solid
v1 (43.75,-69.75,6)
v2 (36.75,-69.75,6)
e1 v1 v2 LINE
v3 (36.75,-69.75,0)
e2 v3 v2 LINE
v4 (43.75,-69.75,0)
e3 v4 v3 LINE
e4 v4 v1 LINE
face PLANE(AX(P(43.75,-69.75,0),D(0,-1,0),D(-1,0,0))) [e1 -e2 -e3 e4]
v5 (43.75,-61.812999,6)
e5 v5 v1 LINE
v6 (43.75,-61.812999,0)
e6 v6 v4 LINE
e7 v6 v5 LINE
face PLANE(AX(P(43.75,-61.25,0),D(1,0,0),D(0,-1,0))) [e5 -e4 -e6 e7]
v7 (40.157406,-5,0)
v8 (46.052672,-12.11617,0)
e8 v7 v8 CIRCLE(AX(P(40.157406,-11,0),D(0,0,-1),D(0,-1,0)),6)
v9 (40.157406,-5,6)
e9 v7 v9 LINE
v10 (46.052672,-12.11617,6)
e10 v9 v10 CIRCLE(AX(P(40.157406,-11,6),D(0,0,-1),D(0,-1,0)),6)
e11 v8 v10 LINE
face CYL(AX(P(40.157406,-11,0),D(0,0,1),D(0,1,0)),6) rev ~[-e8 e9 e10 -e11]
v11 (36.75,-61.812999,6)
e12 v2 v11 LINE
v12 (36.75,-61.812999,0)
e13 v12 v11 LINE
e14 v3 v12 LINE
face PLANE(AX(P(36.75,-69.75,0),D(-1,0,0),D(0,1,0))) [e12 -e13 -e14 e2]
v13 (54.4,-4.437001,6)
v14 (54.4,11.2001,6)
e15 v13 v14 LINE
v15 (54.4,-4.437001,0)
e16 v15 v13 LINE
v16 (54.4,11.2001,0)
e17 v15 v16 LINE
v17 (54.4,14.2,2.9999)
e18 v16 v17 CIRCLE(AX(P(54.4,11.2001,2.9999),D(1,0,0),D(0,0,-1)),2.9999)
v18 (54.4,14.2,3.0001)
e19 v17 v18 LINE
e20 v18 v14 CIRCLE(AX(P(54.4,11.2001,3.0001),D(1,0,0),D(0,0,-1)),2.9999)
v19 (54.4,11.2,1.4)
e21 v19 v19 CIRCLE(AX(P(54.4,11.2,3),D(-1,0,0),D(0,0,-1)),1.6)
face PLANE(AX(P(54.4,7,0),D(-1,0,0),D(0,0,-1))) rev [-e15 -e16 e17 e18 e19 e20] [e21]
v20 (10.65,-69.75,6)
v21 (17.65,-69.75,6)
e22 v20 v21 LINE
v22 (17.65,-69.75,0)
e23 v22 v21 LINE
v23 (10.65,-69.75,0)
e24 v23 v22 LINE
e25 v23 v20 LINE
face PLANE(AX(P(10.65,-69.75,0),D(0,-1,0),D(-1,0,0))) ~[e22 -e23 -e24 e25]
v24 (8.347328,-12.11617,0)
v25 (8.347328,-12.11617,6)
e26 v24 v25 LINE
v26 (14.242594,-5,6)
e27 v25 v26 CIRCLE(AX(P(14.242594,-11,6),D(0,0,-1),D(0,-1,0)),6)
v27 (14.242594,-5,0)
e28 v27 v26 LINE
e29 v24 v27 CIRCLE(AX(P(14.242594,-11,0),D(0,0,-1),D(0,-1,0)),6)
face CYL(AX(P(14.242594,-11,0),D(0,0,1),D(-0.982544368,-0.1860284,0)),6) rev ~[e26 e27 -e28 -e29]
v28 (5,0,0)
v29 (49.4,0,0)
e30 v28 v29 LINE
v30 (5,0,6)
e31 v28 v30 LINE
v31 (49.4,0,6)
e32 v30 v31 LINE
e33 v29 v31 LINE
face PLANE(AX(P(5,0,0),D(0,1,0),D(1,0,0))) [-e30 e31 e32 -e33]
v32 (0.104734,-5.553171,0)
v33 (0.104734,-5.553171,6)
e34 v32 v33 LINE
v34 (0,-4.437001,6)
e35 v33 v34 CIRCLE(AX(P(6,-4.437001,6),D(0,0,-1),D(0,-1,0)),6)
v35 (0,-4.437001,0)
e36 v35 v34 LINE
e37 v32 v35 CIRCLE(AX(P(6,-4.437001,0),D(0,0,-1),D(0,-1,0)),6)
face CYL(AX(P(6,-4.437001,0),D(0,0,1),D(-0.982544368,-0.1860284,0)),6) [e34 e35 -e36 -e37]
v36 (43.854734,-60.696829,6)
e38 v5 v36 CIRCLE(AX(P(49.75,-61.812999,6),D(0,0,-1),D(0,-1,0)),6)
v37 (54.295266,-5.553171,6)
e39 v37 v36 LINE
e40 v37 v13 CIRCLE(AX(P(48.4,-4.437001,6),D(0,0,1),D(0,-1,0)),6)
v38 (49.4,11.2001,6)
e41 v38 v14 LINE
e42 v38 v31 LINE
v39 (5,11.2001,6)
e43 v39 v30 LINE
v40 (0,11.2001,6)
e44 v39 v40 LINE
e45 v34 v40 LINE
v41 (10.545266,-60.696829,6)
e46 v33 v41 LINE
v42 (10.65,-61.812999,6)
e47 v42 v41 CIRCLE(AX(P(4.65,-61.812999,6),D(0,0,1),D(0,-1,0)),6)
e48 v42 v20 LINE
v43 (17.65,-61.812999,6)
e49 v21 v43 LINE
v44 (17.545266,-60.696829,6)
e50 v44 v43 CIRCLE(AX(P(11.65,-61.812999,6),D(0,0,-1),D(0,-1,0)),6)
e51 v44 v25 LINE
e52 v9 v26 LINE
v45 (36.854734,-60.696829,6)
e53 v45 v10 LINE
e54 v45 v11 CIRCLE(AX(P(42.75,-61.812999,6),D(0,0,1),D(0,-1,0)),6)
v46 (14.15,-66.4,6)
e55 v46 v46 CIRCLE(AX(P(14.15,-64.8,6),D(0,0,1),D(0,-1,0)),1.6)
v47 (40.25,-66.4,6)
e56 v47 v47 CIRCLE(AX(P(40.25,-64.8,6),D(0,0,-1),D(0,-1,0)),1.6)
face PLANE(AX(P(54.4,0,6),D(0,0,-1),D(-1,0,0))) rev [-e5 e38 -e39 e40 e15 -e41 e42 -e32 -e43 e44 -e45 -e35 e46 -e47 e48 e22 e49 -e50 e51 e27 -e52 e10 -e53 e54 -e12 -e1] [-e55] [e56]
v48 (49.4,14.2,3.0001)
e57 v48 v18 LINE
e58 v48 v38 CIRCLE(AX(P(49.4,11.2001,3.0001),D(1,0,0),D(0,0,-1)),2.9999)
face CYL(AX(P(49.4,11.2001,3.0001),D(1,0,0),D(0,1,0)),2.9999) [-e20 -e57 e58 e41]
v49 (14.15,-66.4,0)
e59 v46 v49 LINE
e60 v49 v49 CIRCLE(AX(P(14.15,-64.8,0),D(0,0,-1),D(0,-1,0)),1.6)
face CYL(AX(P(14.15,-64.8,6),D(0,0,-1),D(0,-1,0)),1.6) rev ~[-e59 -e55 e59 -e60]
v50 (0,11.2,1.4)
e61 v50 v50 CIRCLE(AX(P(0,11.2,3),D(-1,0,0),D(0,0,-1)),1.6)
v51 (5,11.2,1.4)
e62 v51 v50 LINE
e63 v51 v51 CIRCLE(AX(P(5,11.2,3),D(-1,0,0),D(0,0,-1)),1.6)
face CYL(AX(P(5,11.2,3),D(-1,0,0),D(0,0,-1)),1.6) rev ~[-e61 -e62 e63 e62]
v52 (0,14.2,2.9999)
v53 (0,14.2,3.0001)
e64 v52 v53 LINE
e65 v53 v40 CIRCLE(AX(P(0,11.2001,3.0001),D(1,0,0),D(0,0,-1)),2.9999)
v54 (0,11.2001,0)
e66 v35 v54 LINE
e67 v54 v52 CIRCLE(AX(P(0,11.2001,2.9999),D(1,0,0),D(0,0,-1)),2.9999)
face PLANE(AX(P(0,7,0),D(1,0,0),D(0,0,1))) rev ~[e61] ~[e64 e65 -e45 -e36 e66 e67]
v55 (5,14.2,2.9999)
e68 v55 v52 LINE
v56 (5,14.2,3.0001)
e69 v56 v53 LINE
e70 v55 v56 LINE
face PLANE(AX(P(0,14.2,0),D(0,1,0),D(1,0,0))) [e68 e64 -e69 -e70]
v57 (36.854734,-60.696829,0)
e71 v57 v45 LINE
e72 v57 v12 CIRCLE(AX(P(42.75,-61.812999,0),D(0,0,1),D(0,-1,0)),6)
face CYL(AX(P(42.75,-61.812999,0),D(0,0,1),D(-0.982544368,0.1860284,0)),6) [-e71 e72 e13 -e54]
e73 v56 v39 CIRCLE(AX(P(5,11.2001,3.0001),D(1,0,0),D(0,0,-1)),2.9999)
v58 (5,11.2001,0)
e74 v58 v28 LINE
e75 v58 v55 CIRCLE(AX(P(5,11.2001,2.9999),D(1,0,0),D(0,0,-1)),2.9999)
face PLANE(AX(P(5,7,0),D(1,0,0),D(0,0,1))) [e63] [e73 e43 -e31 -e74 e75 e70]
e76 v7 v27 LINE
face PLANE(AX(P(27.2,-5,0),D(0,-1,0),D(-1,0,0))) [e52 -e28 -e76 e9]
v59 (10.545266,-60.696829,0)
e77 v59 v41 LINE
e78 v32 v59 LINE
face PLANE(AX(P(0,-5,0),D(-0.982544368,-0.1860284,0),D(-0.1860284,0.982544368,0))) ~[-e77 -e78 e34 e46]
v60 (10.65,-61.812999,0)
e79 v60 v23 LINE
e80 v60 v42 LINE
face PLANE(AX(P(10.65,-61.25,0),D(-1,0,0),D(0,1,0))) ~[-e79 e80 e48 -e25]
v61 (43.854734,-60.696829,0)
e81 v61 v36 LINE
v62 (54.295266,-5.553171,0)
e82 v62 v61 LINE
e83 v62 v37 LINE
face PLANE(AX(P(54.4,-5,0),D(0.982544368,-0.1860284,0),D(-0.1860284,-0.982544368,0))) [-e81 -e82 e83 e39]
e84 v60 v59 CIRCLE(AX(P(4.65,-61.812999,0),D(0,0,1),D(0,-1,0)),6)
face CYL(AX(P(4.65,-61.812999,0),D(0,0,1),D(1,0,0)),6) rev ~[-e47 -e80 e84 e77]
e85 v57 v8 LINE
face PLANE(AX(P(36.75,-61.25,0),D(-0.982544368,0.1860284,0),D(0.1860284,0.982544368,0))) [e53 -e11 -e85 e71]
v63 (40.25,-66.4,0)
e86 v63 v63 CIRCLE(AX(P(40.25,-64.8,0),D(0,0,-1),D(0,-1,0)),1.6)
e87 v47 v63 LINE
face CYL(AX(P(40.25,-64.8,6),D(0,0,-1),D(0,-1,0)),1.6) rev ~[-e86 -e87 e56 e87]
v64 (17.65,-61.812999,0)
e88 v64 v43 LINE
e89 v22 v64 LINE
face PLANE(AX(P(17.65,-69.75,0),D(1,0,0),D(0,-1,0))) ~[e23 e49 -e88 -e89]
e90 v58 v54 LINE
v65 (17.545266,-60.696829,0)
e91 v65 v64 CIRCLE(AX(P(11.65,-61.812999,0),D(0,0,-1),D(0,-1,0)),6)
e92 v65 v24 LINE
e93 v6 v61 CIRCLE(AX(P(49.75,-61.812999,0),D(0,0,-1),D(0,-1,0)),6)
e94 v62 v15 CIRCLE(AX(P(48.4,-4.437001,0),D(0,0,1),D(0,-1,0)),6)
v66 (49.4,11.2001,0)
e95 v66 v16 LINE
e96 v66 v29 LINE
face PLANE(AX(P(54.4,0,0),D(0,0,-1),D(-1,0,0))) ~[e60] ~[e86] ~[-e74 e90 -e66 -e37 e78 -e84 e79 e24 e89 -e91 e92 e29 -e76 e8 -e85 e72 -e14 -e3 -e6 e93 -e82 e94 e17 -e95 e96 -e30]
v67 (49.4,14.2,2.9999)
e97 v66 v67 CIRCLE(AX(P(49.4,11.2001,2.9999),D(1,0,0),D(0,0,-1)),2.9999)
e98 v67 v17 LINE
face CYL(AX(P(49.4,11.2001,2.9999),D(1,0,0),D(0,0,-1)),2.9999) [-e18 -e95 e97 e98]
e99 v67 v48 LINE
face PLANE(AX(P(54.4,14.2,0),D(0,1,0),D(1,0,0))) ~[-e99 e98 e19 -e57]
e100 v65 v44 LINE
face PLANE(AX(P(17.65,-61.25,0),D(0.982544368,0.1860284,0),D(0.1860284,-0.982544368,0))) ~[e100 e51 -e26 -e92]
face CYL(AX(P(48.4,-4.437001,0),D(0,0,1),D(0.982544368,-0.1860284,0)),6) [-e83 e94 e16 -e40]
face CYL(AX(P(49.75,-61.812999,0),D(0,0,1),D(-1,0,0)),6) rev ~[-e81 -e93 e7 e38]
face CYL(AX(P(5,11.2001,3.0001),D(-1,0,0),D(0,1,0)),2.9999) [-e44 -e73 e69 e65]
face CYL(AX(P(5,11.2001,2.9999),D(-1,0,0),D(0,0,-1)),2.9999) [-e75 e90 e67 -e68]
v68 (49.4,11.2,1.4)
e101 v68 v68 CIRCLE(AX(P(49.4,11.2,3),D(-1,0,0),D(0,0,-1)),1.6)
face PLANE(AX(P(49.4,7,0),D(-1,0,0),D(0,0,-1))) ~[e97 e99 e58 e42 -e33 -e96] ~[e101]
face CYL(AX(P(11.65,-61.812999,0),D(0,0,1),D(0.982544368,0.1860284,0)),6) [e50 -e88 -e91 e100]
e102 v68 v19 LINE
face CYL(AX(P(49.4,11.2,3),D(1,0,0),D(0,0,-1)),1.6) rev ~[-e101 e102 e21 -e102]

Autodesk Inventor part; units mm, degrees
ref_plane "YZ Plane" through (0, 0, 0) normal (1, 0, 0) x (0, 1, 0)
ref_plane "XZ Plane" through (0, 0, 0) normal (0, 1, 0) x (-1, 0, 0)
sketch "Эскиз1" plane through (0, 0, 0) normal (0, 0, 1) x (1, 0, 0)
  line L0 (0, 0) -> (5, 0)
  line L1 (5, 0) -> (5, 7)
  line L2 (5, 7) -> (0, 7)
  line L3 (0, 7) -> (0, 0)
  line L4 (0, 0) -> (27.2, 0)
  line L5 (27.2, 0) -> (27.2, -5)
  line L6 (27.2, -5) -> (0, -5)
  line L7 (0, -5) -> (0, 0)
  dimension "d0" = 5
  dimension "d1" = 7
  dimension "d2" = 27.2
  dimension "d3" = 5
extrude "Выдавливание1" add sketch "Эскиз1" along normal blind 6
sketch "Эскиз4" plane through (0, 7, 0) normal (0, 1, 0) x (1, 0, 0)
  line L0 (0, 0) -> (0, -6) projected
  line L1 (0, 0) -> (0, -6) projected
  line L2 (5, 0) -> (0, 0) projected
  line L3 (0, 0) -> (0, -6) projected
  line L4 (5, -6) -> (0, -6) projected
  line L5 (5, 0) -> (5, -6) projected
  point P0 (0, -6)
  point P1 (0, 0)
extrude "Выдавливание2" add sketch "Эскиз4" along normal blind 7.2
fillet "Сопряжение1" radius 3 2 edges at (2.5, 14.2, 6) (2.5, 14.2, 0)
sketch "Эскиз5" plane through (5, 0, 6) normal (1, 0, 0) x (0, 0, -1)
  line L0 (0, -5) -> (0, -5) projected
  arc A0 (6, 11.2) -> (0, 11.2) centre (3, 11.2) ccw projected
  point P0 (6, 0)
  point P1 (6, -5)
  point P2 (2.5, 25.2)
hole "Отверстие2" at (5, 11.2, 3) direction (-1, 0, 0) diameter 3.2 depth 5
mirror "Зеркальное отражение1" about plane through (27.2, -5, 0) normal (1, 0, 0)
sketch "Эскиз9" plane through (0, 0, 0) normal (0, 0, -1) x (-1, 0, 0)
  line L0 (0, -5) -> (-54.4, -5) projected
  line L1 (-54.4, 11.2) -> (-54.4, -5) projected
  line L2 (-54.4, -5) -> (-43.75, -61.25)
  line L3 (-43.75, -61.25) -> (-43.75, -69.75)
  line L4 (-43.75, -69.75) -> (-36.75, -69.75)
  line L5 (-36.75, -69.75) -> (-36.75, -61.25)
  line L6 (-36.75, -61.25) -> (-47.4, -5)
  point P0 (0, 0)
  dimension "d82" = 64.75
  dimension "d83" = 7
  dimension "d86" = 8.5
  dimension "d95" = 10.65
extrude "Выдавливание4" add sketch "Эскиз9" against normal blind 6
sketch "Эскиз11" plane through (0, 0, 6) normal (0, 0, 1) x (1, 0, 0)
  line L0 (40.25, -69.75) -> (40.25, -64.8)
  line L1 (36.75, -69.75) -> (43.75, -69.75) projected
  point P0 (0, 0)
  dimension "d91" = 4.95
hole "Отверстие6" at (40.25, -64.8, 6) direction (0, 0, -1) diameter 3.2 end through all
ref_plane "РабПлоскость1" through (27.2, 11.2, 3) normal (1, 0, 0) x (0, 0, -1)
mirror "Зеркальное отражение2" about plane through (27.2, 11.2, 3) normal (1, 0, 0) of "Выдавливание4", "Отверстие6"
fillet "Сопряжение3" radius 6 8 edges at (43.75, -61.25, 3) (36.75, -61.25, 3) (17.65, -61.25, 3) (10.65, -61.25, 3) (0, -5, 3) (7, -5, 3) (47.4, -5, 3) (54.4, -5, 3)
equation "\"Радиус_гибки\" = Толщина"
equation "\"Ширина_просечки\" = Толщина"
equation "\"Глубина_просечки\" = 0.5 * Толщина"
equation "\"Размер_просечки\" = 4 * Толщина"
equation "\"Мин_остаток\" = 2 * Толщина"
equation "\"Радиус_перехода\" = Радиус_гибки"
equation "\"Радиус_Якоби\" = Толщина"
equation "\"Размер_зазора\" = Толщина"
equation "\"Толщина\" = 0.5"
properties part number "Стойка для камеры"
